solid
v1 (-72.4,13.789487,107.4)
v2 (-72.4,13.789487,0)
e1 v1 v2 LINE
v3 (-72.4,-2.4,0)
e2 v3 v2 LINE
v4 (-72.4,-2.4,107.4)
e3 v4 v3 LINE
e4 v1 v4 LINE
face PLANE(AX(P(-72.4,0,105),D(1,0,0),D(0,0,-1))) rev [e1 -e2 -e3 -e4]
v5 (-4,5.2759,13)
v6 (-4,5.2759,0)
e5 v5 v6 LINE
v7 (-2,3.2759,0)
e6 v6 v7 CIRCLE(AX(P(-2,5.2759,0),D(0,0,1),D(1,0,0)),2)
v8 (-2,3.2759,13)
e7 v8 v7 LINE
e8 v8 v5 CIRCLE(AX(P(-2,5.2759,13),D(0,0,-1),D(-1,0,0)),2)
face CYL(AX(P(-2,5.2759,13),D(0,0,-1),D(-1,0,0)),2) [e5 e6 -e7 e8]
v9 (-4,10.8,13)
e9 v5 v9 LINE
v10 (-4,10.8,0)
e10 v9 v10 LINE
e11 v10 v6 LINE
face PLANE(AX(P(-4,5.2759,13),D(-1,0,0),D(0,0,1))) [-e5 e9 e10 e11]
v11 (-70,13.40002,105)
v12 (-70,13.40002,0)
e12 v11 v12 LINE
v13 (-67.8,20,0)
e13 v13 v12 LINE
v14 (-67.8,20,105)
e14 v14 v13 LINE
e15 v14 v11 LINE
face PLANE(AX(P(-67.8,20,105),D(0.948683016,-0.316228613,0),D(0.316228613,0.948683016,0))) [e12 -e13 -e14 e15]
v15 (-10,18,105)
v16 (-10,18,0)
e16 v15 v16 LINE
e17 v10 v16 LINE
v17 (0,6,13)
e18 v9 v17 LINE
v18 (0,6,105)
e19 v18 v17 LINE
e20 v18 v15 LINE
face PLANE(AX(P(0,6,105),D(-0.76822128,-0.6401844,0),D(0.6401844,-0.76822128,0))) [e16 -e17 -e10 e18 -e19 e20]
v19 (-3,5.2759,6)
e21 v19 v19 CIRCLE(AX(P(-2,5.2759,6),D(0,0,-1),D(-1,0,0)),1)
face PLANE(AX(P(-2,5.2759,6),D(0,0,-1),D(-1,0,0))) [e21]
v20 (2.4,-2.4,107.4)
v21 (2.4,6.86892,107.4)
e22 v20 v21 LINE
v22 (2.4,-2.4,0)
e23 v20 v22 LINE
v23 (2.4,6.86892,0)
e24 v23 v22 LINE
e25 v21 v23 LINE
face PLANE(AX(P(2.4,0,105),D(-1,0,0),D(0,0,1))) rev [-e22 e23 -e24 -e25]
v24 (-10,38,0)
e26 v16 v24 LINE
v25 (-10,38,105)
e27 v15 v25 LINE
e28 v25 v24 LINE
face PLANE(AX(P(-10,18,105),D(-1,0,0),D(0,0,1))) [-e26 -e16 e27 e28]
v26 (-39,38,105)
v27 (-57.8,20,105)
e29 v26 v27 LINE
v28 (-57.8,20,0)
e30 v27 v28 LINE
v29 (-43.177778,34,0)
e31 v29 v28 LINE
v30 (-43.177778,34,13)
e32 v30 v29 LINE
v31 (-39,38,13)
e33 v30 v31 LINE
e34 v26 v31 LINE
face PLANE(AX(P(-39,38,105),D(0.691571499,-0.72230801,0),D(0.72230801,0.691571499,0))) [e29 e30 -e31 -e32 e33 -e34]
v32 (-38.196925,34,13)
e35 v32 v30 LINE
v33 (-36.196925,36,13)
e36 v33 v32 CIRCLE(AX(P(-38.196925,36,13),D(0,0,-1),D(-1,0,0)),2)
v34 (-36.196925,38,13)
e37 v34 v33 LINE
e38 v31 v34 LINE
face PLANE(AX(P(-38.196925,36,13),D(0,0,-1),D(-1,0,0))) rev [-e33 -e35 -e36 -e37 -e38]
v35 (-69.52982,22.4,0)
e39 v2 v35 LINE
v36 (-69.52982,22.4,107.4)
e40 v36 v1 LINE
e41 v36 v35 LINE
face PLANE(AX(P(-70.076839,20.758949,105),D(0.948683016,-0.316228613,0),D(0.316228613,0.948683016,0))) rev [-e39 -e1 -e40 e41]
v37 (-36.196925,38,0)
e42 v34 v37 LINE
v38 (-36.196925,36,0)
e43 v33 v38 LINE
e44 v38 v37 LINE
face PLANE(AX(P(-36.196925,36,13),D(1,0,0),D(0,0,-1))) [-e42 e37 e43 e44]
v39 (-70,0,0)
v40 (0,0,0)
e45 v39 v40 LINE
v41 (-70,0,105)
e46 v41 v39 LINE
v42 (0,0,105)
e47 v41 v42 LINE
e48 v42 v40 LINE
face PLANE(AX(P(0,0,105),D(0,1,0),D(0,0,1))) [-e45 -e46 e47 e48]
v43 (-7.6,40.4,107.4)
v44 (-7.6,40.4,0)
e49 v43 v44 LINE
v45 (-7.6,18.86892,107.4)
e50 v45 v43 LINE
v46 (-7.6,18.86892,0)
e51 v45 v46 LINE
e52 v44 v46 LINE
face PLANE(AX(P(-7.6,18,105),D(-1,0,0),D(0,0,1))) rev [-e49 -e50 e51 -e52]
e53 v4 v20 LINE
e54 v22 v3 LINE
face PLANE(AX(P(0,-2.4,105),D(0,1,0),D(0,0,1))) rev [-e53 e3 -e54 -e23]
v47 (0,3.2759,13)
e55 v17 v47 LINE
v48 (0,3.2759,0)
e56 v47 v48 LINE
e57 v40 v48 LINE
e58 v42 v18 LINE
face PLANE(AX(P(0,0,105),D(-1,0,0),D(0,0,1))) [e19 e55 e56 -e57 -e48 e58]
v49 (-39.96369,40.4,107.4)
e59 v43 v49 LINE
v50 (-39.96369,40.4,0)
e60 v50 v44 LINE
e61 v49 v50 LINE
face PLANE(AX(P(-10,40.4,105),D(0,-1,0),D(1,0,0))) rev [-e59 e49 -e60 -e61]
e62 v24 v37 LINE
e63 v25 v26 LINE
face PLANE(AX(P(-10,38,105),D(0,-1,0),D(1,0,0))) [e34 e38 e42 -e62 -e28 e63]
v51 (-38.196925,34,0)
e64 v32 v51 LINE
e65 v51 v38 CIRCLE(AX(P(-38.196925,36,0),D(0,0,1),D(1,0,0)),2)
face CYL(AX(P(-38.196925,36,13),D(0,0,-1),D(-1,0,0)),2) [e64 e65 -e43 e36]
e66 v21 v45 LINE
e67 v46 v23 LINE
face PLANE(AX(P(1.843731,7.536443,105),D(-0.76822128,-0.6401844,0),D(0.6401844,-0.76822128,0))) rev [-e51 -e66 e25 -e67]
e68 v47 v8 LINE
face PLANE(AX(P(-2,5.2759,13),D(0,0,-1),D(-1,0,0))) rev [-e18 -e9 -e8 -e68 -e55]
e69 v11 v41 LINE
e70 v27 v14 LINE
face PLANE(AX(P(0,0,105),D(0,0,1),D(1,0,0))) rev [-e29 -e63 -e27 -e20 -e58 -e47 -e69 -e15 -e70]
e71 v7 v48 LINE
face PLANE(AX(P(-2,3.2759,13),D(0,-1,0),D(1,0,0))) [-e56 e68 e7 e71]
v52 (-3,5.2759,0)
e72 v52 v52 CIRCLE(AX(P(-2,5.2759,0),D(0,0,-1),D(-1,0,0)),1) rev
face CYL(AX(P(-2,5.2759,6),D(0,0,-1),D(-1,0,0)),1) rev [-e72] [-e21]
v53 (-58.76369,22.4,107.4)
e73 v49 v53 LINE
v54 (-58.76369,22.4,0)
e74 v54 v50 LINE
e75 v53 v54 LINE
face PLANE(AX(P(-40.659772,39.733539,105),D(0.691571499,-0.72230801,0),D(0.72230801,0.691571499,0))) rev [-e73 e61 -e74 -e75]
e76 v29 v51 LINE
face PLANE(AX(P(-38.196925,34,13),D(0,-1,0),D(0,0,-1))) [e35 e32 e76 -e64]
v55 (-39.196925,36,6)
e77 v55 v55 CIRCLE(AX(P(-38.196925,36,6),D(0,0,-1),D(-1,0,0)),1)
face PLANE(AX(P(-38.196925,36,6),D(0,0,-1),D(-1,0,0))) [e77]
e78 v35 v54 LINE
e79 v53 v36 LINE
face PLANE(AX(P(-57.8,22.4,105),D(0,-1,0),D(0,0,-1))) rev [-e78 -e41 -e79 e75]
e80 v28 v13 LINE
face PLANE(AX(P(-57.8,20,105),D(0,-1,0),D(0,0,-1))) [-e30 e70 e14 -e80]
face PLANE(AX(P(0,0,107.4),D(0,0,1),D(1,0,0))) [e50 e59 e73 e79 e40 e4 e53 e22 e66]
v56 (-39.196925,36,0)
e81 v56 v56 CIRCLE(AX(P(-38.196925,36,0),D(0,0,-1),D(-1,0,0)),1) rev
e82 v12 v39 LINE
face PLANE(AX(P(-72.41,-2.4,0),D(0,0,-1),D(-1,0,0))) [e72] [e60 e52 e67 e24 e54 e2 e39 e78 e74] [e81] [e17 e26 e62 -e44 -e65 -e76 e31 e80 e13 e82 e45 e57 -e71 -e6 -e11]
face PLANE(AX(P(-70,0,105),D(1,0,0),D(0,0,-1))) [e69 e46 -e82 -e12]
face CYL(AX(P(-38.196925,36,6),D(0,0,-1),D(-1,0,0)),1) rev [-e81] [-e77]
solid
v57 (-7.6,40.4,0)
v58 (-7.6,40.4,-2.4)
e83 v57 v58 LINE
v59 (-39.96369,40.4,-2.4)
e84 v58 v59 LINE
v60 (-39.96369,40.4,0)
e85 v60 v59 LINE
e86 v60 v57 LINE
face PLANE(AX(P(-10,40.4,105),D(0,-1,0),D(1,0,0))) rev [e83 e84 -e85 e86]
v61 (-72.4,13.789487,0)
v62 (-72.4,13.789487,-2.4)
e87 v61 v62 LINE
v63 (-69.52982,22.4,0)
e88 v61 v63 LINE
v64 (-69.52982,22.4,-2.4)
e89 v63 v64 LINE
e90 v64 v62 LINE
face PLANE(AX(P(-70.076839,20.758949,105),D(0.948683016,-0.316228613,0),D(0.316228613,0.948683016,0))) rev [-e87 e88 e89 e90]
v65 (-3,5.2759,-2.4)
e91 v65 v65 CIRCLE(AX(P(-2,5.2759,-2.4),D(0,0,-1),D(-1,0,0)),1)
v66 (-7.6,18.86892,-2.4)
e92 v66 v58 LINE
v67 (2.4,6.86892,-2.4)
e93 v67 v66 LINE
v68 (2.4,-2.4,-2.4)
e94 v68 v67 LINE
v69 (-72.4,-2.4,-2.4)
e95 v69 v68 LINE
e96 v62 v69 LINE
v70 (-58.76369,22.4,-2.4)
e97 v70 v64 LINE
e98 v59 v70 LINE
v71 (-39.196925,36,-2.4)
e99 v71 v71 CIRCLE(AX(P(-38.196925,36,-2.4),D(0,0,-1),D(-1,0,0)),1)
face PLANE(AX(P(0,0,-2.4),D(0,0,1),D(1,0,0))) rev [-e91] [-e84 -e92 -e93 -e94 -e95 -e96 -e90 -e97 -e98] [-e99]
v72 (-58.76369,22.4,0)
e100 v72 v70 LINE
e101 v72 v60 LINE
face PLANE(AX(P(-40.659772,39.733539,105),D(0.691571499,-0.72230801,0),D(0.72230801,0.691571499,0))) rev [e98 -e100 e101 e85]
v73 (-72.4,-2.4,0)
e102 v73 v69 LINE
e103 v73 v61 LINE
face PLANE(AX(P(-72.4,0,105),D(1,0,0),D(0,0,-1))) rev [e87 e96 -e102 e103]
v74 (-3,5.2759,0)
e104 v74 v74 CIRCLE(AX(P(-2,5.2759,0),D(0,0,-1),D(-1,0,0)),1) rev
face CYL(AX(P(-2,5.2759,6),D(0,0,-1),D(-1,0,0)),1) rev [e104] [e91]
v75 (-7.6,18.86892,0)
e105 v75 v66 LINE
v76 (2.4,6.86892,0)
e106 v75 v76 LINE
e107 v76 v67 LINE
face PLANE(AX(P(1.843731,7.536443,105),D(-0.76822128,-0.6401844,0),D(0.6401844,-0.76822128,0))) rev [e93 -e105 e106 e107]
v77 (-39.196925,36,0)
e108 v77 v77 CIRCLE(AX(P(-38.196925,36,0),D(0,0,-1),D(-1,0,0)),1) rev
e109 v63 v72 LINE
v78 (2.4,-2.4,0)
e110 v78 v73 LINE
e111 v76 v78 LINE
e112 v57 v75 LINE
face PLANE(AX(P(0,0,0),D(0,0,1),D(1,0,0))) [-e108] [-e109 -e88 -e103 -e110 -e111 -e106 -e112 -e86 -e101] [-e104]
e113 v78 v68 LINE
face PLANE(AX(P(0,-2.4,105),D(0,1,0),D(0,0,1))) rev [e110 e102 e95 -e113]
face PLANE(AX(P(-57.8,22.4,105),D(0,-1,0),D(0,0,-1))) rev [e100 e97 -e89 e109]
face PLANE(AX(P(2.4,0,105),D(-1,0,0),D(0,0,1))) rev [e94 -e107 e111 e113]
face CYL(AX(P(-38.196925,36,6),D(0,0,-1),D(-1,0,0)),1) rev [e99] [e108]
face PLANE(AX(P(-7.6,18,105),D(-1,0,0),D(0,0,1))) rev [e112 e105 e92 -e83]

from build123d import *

# Parameters (mm, degrees)
BOSS_EXTRUDE1_DEPTH    = 105
SHELL1_START           = -10
SHELL1_OUTLINE_W       = 18
SHELL1_OUTLINE_H       = 109.8
SHELL1_DEPTH           = 2.4
SHELL1_START_2         = -58.763690343
SHELL1_2_OUTLINE_W     = 42.8
SHELL1_2_OUTLINE_H     = 109.8
SHELL1_2_DEPTH         = 51.163690343
SHELL1_START_3         = -72.4
SHELL1_3_OUTLINE_W     = 24.8
SHELL1_3_OUTLINE_H     = 109.8
SHELL1_3_DEPTH         = 74.8
SHELL1_4_DEPTH         = 105
SHELL1_START_4         = -2.4
SHELL1_5_DEPTH         = 109.8
BOSS_EXTRUDE3_DEPTH    = 15.4
SKETCH5_R              = 1
CUT_EXTRUDE1_DEPTH     = 8.4
SPLIT1_SURFACE_1_BACK  = 140.581
SPLIT1_SURFACE_1_DEPTH = 281.162
SPLIT1_SURFACE_2_BACK  = 140.581
SPLIT1_SURFACE_2_DEPTH = 281.162


with BuildPart() as part:
    # Sketch1 → Boss-Extrude1 (new body)
    with BuildSketch(Plane.XY):
        Polygon((-39, 38), (-57.8, 20), (-67.8, 20), (-70, 13.400019651), (-70, 0), (0, 0), (0, 6), (-10, 18), (-10, 38), align=None)
    extrude(amount=BOSS_EXTRUDE1_DEPTH)

    # Shell1: read off the stored shape, not the designer's step
    # Shell1 outline → Shell1 (add)
    with BuildSketch(Plane.YZ.offset(SHELL1_START)):
        with Locations((31.4, 52.5)):
            Rectangle(SHELL1_OUTLINE_W, SHELL1_OUTLINE_H)
    extrude(amount=SHELL1_DEPTH)

    # Shell1 2 outline → Shell1 2 (add)
    with BuildSketch(Plane.YZ.offset(SHELL1_START_2)):
        with Locations((19, 52.5)):
            Rectangle(SHELL1_2_OUTLINE_W, SHELL1_2_OUTLINE_H)
    extrude(amount=SHELL1_2_DEPTH)

    # Shell1 3 outline → Shell1 3 (add)
    with BuildSketch(Plane.YZ.offset(SHELL1_START_3)):
        with Locations((10, 52.5)):
            Rectangle(SHELL1_3_OUTLINE_W, SHELL1_3_OUTLINE_H)
    extrude(amount=SHELL1_3_DEPTH)

    # Shell1 4 outline → Shell1 4 (cut)
    with BuildSketch(Plane.XY):
        Polygon((-7.6, 22.4), (-7.6, 18.868919844), (2.4, 6.868919844), (2.4, 22.4), align=None)
        Polygon((-72.4, 13.789487135), (-69.529820499, 22.4), (-72.4, 22.4), align=None)
        Polygon((-58.763690343, 22.4), (-39.963690343, 40.4), (-58.763690343, 40.4), align=None)
        Polygon((0, 0), (0, 6), (-10, 18), (-10, 38), (-39, 38), (-57.8, 20), (-67.8, 20), (-70, 13.400019651), (-70, 0), align=None)
    extrude(amount=SHELL1_4_DEPTH, mode=Mode.SUBTRACT)

    # Shell1 5 outline → Shell1 5 (cut)
    with BuildSketch(Plane.XY.offset(SHELL1_START_4)):
        Polygon((-7.6, 22.4), (-7.6, 18.868919844), (2.4, 6.868919844), (2.4, 22.4), align=None)
        Polygon((-72.4, 13.789487135), (-69.529820499, 22.4), (-72.4, 22.4), align=None)
        Polygon((-58.763690343, 22.4), (-39.963690343, 40.4), (-58.763690343, 40.4), align=None)
    extrude(amount=SHELL1_5_DEPTH, mode=Mode.SUBTRACT)

    # Sketch4 → Boss-Extrude3 (add)
    with BuildSketch(Plane(origin=(0, 0, -2.4), x_dir=(-1, 0, 0), z_dir=(0, 0, -1))):
        with BuildLine():
            Line((36.196924714, 36), (36.196924714, 38))
            Line((36.196924714, 38), (39, 38))
            Line((39, 38), (43.177777778, 34))
            Line((43.177777778, 34), (38.196924714, 34))
            ThreePointArc((38.196924714, 34), (36.782711151, 34.585786438), (36.196924714, 36))
        make_face()
        with BuildLine():
            Line((2, 3.27590013), (0, 3.27590013))
            Line((0, 3.27590013), (0, 6))
            Line((0, 6), (4, 10.8))
            Line((4, 10.8), (4, 5.27590013))
            ThreePointArc((4, 5.27590013), (3.414213562, 3.861686567), (2, 3.27590013))
        make_face()
    extrude(amount=-BOSS_EXTRUDE3_DEPTH)

    # Sketch5 → Cut-Extrude1 (cut)
    with BuildSketch(Plane(origin=(0, 0, -2.4), x_dir=(-1, 0, 0), z_dir=(0, 0, -1))):
        with Locations((2, 5.27590013)):
            Circle(SKETCH5_R)
        with Locations((38.196924714, 36)):
            Circle(SKETCH5_R)
    extrude(amount=-CUT_EXTRUDE1_DEPTH, mode=Mode.SUBTRACT)


with BuildPart() as body_2:
    # Split1: the piece behind the surface
    add(part.part)
    # Split1 surface: a surface, the sketch's curves swept straight by 281.162 mm
    with BuildLine(Plane(origin=(0, 0, 0), x_dir=(0, 0, -1), z_dir=(1, 0, 0)).offset(-SPLIT1_SURFACE_1_BACK), mode=Mode.PRIVATE) as split1_surface_1_path:
        Line((0, -2.4), (0, 40.4))
    split1_surface_1 = Shell.extrude(split1_surface_1_path.wire(), (1 * SPLIT1_SURFACE_1_DEPTH, 0 * SPLIT1_SURFACE_1_DEPTH, 0 * SPLIT1_SURFACE_1_DEPTH))
    split(bisect_by=split1_surface_1, keep=Keep.BOTTOM)


with BuildPart() as part_1:
    add(part.part)

    # Split1: split by a surface, the side it looks to stays
    # Split1 surface: a surface, the sketch's curves swept straight by 281.162 mm
    with BuildLine(Plane(origin=(0, 0, 0), x_dir=(0, 0, -1), z_dir=(1, 0, 0)).offset(-SPLIT1_SURFACE_2_BACK), mode=Mode.PRIVATE) as split1_surface_2_path:
        Line((0, -2.4), (0, 40.4))
    split1_surface_2 = Shell.extrude(split1_surface_2_path.wire(), (1 * SPLIT1_SURFACE_2_DEPTH, 0 * SPLIT1_SURFACE_2_DEPTH, 0 * SPLIT1_SURFACE_2_DEPTH))
    split(bisect_by=split1_surface_2, keep=Keep.TOP)


solid = Compound([body_2.part, part_1.part])
